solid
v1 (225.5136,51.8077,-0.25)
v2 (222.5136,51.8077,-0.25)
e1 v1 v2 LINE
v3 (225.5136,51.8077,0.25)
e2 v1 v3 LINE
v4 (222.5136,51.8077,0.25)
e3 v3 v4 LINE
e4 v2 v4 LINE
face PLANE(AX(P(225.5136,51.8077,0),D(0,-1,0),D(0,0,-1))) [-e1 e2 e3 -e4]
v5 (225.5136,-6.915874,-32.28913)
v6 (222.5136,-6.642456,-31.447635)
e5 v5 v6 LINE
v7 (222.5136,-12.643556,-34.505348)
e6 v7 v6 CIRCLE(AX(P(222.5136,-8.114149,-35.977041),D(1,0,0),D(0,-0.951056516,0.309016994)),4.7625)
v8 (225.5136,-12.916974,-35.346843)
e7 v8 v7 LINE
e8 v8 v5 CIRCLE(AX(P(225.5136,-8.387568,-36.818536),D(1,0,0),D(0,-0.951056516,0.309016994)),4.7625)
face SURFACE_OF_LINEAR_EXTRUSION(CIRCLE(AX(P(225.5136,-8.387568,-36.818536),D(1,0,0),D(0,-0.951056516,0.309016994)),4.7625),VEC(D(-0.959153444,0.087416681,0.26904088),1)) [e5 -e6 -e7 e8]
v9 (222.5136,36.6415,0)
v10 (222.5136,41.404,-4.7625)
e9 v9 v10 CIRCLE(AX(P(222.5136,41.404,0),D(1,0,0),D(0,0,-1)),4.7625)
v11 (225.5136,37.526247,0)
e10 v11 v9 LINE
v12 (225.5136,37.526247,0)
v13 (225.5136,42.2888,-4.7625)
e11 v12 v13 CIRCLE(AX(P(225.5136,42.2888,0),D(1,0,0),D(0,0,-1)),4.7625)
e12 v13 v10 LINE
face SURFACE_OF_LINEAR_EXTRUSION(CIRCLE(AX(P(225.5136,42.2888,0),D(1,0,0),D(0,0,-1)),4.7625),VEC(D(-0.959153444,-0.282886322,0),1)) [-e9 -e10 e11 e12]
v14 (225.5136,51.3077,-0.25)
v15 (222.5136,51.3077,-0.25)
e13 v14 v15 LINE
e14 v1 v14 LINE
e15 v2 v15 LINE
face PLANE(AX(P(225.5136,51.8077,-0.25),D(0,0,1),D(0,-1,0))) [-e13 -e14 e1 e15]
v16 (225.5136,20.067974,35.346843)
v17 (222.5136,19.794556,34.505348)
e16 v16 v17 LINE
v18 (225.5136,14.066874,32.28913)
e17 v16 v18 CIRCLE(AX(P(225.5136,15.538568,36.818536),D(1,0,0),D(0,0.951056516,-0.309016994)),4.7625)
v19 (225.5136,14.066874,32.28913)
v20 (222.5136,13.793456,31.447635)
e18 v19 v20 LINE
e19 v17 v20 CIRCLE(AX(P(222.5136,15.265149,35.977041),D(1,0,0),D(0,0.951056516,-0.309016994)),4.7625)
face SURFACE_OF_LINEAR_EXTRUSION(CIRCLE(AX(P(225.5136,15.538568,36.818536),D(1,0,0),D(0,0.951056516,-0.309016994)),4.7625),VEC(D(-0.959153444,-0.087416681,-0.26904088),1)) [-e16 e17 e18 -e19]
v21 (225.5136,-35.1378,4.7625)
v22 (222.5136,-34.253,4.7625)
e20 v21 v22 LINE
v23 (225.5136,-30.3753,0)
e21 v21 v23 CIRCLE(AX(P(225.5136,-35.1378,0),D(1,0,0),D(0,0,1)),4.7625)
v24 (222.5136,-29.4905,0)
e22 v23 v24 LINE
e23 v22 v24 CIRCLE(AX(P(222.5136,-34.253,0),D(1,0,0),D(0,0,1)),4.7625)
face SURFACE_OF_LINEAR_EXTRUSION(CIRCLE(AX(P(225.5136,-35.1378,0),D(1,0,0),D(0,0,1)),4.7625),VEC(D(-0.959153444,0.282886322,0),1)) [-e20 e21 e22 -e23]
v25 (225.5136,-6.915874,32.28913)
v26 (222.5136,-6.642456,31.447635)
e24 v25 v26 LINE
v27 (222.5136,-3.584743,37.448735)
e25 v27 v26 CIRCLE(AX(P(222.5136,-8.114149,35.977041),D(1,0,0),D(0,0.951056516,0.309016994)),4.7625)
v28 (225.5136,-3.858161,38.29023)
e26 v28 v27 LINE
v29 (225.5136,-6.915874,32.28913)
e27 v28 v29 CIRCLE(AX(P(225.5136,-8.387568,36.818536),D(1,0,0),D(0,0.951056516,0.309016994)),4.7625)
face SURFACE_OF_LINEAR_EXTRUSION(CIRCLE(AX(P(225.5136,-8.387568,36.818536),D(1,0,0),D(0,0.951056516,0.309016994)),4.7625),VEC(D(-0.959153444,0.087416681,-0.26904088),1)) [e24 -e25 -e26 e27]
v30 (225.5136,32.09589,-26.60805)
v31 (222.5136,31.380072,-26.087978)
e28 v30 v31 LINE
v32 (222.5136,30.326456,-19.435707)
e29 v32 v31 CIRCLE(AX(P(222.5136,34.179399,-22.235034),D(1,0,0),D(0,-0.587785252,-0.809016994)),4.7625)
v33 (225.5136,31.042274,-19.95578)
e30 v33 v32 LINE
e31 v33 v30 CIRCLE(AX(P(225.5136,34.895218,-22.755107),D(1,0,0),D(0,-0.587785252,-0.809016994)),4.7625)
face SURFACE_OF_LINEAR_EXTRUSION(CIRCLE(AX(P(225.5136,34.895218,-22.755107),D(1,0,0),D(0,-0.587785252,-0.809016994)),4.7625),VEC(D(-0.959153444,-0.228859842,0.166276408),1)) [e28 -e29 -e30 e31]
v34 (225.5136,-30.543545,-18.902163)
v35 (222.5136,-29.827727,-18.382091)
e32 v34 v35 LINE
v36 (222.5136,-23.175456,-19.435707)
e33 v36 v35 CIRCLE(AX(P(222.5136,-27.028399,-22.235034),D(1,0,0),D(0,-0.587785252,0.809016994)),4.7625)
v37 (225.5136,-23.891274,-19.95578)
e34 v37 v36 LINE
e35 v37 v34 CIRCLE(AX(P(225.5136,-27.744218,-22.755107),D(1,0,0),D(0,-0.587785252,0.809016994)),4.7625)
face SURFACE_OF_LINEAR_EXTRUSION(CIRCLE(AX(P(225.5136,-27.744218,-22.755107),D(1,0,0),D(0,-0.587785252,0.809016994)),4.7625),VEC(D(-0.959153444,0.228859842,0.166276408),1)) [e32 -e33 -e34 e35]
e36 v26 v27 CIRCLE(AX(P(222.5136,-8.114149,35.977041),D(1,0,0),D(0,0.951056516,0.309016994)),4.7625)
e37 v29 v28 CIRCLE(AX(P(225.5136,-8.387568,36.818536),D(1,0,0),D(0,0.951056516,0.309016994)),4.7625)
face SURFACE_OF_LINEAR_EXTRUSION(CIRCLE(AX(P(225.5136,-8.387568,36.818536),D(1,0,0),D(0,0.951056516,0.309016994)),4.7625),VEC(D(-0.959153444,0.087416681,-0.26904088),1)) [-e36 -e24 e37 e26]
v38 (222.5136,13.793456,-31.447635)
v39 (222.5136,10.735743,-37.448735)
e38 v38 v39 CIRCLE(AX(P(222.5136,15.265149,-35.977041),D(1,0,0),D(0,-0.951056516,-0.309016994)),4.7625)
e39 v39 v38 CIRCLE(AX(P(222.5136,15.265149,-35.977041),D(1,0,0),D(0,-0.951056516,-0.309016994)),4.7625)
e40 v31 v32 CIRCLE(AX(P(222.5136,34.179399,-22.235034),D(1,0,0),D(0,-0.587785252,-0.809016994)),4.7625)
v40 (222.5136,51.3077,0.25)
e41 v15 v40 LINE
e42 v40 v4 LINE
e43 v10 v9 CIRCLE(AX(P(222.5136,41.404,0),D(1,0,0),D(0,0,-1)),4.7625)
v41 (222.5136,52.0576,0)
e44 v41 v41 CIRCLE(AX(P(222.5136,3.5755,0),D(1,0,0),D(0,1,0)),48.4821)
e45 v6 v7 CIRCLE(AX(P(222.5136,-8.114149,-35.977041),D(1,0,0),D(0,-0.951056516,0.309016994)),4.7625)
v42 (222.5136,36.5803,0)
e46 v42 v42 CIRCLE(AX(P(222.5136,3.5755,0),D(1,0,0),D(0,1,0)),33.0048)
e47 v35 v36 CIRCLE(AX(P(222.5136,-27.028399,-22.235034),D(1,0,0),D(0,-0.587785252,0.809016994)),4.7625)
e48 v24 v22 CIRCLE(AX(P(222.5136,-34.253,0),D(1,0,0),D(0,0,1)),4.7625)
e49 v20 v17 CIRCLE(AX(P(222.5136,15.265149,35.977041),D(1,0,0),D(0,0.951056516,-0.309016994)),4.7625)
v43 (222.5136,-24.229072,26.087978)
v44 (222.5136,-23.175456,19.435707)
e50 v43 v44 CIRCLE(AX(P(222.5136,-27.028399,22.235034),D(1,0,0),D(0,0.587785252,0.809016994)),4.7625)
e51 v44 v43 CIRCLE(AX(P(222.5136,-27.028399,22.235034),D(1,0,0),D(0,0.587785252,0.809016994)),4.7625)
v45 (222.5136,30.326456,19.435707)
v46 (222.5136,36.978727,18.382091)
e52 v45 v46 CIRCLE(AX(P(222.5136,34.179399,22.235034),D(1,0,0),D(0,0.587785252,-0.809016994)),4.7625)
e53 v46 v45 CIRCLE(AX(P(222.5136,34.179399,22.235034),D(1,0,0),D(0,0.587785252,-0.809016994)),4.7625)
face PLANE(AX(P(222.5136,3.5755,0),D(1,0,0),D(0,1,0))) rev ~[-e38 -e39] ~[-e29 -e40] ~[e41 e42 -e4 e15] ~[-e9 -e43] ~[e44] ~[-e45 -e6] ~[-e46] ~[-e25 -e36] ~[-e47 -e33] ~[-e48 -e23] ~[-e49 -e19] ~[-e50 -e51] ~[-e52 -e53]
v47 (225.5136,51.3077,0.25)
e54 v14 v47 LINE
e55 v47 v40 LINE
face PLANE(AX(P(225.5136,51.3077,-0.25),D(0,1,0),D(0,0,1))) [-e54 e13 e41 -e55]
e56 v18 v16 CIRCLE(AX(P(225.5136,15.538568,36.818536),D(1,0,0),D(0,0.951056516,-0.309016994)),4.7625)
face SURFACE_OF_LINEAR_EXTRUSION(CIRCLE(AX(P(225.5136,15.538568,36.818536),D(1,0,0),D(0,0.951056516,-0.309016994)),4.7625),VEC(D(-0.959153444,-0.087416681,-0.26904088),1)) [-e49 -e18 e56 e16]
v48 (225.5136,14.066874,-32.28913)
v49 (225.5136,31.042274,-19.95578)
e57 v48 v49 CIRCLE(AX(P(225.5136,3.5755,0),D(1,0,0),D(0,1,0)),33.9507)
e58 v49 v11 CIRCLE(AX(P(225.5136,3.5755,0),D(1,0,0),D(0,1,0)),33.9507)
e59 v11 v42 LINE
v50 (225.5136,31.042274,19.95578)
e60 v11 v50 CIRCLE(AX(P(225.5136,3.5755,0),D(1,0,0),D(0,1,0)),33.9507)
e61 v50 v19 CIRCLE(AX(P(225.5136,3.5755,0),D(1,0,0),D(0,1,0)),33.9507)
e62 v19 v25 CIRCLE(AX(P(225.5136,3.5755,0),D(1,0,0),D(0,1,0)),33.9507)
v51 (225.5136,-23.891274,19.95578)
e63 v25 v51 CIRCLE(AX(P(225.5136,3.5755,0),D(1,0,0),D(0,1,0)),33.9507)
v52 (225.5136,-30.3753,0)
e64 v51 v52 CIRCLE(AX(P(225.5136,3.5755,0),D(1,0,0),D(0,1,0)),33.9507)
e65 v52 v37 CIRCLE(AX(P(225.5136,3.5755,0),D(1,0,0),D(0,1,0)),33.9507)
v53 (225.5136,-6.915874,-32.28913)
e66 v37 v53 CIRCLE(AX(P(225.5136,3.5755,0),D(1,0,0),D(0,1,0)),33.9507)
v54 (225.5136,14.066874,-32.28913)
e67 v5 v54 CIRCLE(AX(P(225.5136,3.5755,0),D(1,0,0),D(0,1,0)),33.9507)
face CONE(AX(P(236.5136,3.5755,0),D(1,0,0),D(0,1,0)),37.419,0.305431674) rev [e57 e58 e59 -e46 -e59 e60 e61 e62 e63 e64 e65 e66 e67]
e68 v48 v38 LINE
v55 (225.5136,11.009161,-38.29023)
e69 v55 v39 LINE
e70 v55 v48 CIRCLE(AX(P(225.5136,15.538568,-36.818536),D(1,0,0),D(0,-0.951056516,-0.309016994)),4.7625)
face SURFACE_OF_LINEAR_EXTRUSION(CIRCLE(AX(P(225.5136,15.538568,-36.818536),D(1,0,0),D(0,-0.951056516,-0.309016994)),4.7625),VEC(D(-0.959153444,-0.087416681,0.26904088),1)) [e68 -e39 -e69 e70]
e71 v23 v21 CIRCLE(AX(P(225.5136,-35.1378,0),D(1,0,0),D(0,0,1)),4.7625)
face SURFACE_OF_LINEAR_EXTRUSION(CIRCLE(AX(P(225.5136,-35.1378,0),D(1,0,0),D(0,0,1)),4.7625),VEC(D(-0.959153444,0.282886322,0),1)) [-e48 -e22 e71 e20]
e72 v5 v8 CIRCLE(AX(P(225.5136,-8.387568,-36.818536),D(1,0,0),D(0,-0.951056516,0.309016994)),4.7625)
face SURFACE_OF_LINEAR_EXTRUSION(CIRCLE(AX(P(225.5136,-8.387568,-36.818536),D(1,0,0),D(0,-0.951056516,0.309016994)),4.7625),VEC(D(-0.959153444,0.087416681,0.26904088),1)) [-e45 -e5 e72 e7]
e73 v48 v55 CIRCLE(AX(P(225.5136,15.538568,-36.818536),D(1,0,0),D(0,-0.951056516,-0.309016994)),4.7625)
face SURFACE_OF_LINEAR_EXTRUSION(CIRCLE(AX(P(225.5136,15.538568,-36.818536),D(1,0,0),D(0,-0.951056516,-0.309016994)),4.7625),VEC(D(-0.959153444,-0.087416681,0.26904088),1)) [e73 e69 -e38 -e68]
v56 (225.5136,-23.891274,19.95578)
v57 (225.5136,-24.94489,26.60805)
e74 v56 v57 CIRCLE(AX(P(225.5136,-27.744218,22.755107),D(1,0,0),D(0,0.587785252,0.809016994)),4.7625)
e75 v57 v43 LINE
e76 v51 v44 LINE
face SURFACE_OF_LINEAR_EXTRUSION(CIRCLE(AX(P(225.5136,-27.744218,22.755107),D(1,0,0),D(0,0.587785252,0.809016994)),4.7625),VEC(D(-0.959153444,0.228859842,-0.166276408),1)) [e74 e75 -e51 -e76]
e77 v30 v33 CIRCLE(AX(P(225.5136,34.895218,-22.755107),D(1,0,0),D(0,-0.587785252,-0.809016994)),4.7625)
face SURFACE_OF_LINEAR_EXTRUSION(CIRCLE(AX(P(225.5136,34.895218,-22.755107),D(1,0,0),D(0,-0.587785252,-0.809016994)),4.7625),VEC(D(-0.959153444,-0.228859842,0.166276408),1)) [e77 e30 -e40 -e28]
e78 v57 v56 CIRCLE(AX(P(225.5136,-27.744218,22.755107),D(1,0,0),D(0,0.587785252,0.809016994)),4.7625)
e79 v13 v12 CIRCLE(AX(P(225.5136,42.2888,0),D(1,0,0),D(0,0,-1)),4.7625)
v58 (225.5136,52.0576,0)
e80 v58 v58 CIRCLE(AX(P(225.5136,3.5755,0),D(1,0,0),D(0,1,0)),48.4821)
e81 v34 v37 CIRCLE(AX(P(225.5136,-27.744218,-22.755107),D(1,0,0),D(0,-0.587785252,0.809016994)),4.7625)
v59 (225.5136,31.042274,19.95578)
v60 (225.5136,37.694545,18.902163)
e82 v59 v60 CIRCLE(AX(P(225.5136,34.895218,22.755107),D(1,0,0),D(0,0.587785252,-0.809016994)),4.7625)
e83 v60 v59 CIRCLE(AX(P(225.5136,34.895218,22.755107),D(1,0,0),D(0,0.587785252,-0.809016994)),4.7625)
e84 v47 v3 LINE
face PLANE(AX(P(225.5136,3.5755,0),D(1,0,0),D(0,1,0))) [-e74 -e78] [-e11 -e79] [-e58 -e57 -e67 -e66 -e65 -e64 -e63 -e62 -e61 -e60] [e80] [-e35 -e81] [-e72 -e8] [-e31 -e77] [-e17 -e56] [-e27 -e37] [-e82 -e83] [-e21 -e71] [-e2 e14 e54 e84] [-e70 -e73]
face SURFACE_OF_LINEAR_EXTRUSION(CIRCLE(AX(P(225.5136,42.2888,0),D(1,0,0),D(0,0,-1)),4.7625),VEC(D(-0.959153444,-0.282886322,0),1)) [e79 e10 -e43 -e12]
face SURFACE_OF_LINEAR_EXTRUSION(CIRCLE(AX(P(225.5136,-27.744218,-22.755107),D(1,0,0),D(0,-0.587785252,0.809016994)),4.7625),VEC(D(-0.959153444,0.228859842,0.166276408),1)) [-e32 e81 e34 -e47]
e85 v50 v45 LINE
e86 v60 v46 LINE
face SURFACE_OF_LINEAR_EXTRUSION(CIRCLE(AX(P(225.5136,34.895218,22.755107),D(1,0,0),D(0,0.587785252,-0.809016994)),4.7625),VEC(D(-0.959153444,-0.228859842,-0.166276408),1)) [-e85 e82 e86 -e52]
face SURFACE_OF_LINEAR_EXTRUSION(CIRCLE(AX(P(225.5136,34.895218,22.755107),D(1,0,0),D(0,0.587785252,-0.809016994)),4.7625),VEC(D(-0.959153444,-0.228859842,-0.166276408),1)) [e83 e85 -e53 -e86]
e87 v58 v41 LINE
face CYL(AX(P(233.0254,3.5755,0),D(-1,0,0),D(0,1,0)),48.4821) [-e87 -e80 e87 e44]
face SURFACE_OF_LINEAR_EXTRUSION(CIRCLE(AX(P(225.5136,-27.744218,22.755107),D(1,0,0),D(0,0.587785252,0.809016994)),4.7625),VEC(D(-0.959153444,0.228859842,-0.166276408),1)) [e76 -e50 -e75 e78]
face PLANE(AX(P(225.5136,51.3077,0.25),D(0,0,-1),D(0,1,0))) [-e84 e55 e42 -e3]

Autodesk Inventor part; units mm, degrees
ref_plane "YZ Plane" through (0, 0, 0) normal (1, 0, 0) x (0, 1, 0)
ref_plane "XZ Plane" through (0, 0, 0) normal (0, 1, 0) x (-1, 0, 0)
ref_plane "XY Plane" through (0, 0, 0) normal (0, 0, 1) x (1, 0, 0)
sketch "Sketch1" plane through (0, 0, 0) normal (0, 0, 1) x (1, 0, 0)
  arc A0 (180.1312, 23.4516) -> (181.5833, 23.6751) centre (180.1312, 28.2803) ccw
  arc A1 (180.1312, 23.4516) -> (181.5842, 23.6753) centre (180.1312, 28.2803) ccw
  arc A2 (180.1312, 21.4516) -> (182.1847, 21.7676) centre (180.1312, 28.2803) ccw
  arc A3 (167.724, 26.7761) -> (180.1312, 23.4516) centre (180.1312, 48.266) ccw
  arc A4 (166.724, 25.044) -> (180.1312, 21.4516) centre (180.1312, 48.266) ccw
  arc A5 (166.724, 53.0576) -> (167.724, 52.0576) centre (167.724, 53.0576) ccw
  line L0 (233.0254, 52.0576) -> (167.724, 52.0576)
  line L1 (233.0254, 54.0576) -> (169.724, 54.0576)
  line L2 (182.1847, 21.7676) -> (237.115, 39.0871)
  line L3 (236.5136, 40.9945) -> (181.5833, 23.6751)
  line L4 (168.724, 25.044) -> (168.724, 31.7835)
  line L5 (166.724, 25.044) -> (166.724, -4.6444)
  line L6 (236.5136, 40.9945) -> (237.115, 39.0871)
  line L7 (233.0254, 52.0576) -> (237.115, 52.0576)
  line L8 (233.0254, 54.0576) -> (237.115, 54.0576)
  line L9 (237.115, 52.0576) -> (237.115, 54.0576)
  line L10 (0, 3.5755) -> (319.1694, 3.5755)
  line L11 (0, 88.1805) -> (30.0219, 88.1805)
  line L12 (30.0219, 90.1805) -> (0, 90.1805)
  line L13 (0, 88.1805) -> (0, 90.1805)
  line L14 (0, 77.0805) -> (30.0219, 77.0805)
  line L15 (0, 75.0805) -> (30.0219, 75.0805)
  line L16 (124.3912, 51.7943) -> (167.724, 26.7761)
  line L17 (123.3912, 50.0622) -> (166.724, 25.044)
  line L18 (166.724, 25.044) -> (166.724, 31.1529)
  arc A6 (123.3912, 50.0622) -> (30.0219, 75.0805) centre (30.0219, -111.6581) ccw
  arc A7 (124.3912, 51.7943) -> (30.0219, 77.0805) centre (30.0219, -111.6581) ccw
  line L19 (30.0219, 88.1805) -> (165.724, 88.1805)
  line L20 (167.724, 90.1805) -> (30.0219, 90.1805)
  line L21 (166.724, 53.0576) -> (166.724, 87.1805)
  line L22 (168.724, 55.0576) -> (168.724, 89.1805)
  arc A8 (168.724, 55.0576) -> (169.724, 54.0576) centre (169.724, 55.0576) ccw
  arc A9 (166.724, 87.1805) -> (165.724, 88.1805) centre (165.724, 87.1805) ccw
  arc A10 (168.724, 89.1805) -> (167.724, 90.1805) centre (167.724, 89.1805) ccw
  line L23 (236.5136, 40.9945) -> (236.5136, 52.0576)
  line L24 (236.5136, 52.0576) -> (233.5136, 52.0576)
  line L25 (233.5136, 52.0576) -> (233.5136, 40.0486)
  line L26 (233.5136, 52.0576) -> (225.5136, 52.0576)
  line L27 (225.5136, 52.0576) -> (225.5136, 37.5262)
  line L28 (225.5136, 52.0576) -> (222.5136, 52.0576)
  line L29 (222.5136, 52.0576) -> (222.5136, 36.5803)
  line L30 (233.0254, 52.0576) -> (225.5136, 49.6892)
  line L31 (222.5136, 48.7433) -> (144.4694, 24.136)
  dimension "d18" = 30.0219
  dimension "d19" = 186.7386
  dimension "d20" = 0
  dimension "d21" = 0
  dimension "d22" = 71.505
  dimension "d23" = 2
  dimension "d24" = 2
  dimension "d25" = 2
  dimension "d26" = 2
  dimension "d27" = 2
  dimension "d28" = 17.5
  dimension "d29" = 54.9303
  dimension "d30" = 2
  dimension "d31" = 11.1
  dimension "d32" = 11.6
  dimension "d34" = 2
  dimension "d35" = 2
  dimension "d36" = 1
  dimension "d37" = 1
  dimension "d38" = 1
  dimension "d39" = 1
  dimension "d40" = 3
  dimension "d41" = 8
  dimension "d42" = 3
revolve "Revolution1" add sketch "Sketch1" angle 360 about axis through (0, 3.5755, 0) along (1, 0, 0) contours L29 L0 L27 L3
sketch "Sketch4" plane through (225.5136, 3.5755, 0) normal (1, 0, 0) x (0, 0, -1)
  circle A0 centre (0, 0) radius 33.9508 projected
  line L0 (0, 33.9508) -> (0, 38.7133)
  circle A1 centre (0, 38.7133) radius 4.7625
  point P0 (0, -3.5755)
  dimension "d47" = 4.7625
  dimension "d48" = 9.525
sketch "Sketch5" plane through (222.5136, 3.5755, 0) normal (-1, 0, 0) x (0, 0, 1)
  circle A0 centre (0, 0) radius 33.0049 projected
  line L0 (0, 33.0049) -> (0, 37.7674)
  circle A1 centre (0, 37.7674) radius 4.7625
  point P0 (0, -3.5755)
  dimension "d49" = 4.7625
  dimension "d50" = 9.525
sketch "Sketch6" plane through (0, 0, 0) normal (0, 0, 1) x (1, 0, 0)
  line L0 (225.5136, -44.9067) -> (225.5136, 52.0576) projected
  line L1 (225.5136, 42.2627) -> (222.5136, 41.3779)
  line L2 (222.5136, -44.9067) -> (222.5136, 52.0576) projected
  point P0 (0, 0)
sweep "Sweep1" cut profiles "Sketch4" path "Sketch6" path curves L1 contours A1
pattern_circular "Circular Pattern1" count 10 over 360 about axis through (224.0136, 3.5755, 0) along (1, 0, 0) of "Sweep1"
sketch "Sketch7" plane through (225.5136, 3.5755, 0) normal (1, 0, 0) x (0, 0, -1)
  circle A0 centre (0, 0) radius 48.4822 projected
  line L0 (0, 48.4822) -> (0, 47.9822)
  line L1 (0.25, 47.7322) -> (-0.25, 47.7322)
  line L2 (-0.25, 47.7322) -> (-0.25, 48.2322)
  line L3 (-0.25, 48.2322) -> (0.25, 48.2322)
  line L4 (0.25, 48.2322) -> (0.25, 47.7322)
  line L5 (0.25, 47.7322) -> (-0.25, 48.2322) construction
  line L6 (-0.25, 47.7322) -> (0.25, 48.2322) construction
  point P0 (0, -3.5755)
  dimension "d56" = 0.5
  dimension "d60" = 0.5
  dimension "d61" = 0.5
extrude "Extrusion1" cut sketch "Sketch7" against normal blind 10 contours L1 L2 L3 L4
properties part number "back bracket 2" material "Stainless Steel"
